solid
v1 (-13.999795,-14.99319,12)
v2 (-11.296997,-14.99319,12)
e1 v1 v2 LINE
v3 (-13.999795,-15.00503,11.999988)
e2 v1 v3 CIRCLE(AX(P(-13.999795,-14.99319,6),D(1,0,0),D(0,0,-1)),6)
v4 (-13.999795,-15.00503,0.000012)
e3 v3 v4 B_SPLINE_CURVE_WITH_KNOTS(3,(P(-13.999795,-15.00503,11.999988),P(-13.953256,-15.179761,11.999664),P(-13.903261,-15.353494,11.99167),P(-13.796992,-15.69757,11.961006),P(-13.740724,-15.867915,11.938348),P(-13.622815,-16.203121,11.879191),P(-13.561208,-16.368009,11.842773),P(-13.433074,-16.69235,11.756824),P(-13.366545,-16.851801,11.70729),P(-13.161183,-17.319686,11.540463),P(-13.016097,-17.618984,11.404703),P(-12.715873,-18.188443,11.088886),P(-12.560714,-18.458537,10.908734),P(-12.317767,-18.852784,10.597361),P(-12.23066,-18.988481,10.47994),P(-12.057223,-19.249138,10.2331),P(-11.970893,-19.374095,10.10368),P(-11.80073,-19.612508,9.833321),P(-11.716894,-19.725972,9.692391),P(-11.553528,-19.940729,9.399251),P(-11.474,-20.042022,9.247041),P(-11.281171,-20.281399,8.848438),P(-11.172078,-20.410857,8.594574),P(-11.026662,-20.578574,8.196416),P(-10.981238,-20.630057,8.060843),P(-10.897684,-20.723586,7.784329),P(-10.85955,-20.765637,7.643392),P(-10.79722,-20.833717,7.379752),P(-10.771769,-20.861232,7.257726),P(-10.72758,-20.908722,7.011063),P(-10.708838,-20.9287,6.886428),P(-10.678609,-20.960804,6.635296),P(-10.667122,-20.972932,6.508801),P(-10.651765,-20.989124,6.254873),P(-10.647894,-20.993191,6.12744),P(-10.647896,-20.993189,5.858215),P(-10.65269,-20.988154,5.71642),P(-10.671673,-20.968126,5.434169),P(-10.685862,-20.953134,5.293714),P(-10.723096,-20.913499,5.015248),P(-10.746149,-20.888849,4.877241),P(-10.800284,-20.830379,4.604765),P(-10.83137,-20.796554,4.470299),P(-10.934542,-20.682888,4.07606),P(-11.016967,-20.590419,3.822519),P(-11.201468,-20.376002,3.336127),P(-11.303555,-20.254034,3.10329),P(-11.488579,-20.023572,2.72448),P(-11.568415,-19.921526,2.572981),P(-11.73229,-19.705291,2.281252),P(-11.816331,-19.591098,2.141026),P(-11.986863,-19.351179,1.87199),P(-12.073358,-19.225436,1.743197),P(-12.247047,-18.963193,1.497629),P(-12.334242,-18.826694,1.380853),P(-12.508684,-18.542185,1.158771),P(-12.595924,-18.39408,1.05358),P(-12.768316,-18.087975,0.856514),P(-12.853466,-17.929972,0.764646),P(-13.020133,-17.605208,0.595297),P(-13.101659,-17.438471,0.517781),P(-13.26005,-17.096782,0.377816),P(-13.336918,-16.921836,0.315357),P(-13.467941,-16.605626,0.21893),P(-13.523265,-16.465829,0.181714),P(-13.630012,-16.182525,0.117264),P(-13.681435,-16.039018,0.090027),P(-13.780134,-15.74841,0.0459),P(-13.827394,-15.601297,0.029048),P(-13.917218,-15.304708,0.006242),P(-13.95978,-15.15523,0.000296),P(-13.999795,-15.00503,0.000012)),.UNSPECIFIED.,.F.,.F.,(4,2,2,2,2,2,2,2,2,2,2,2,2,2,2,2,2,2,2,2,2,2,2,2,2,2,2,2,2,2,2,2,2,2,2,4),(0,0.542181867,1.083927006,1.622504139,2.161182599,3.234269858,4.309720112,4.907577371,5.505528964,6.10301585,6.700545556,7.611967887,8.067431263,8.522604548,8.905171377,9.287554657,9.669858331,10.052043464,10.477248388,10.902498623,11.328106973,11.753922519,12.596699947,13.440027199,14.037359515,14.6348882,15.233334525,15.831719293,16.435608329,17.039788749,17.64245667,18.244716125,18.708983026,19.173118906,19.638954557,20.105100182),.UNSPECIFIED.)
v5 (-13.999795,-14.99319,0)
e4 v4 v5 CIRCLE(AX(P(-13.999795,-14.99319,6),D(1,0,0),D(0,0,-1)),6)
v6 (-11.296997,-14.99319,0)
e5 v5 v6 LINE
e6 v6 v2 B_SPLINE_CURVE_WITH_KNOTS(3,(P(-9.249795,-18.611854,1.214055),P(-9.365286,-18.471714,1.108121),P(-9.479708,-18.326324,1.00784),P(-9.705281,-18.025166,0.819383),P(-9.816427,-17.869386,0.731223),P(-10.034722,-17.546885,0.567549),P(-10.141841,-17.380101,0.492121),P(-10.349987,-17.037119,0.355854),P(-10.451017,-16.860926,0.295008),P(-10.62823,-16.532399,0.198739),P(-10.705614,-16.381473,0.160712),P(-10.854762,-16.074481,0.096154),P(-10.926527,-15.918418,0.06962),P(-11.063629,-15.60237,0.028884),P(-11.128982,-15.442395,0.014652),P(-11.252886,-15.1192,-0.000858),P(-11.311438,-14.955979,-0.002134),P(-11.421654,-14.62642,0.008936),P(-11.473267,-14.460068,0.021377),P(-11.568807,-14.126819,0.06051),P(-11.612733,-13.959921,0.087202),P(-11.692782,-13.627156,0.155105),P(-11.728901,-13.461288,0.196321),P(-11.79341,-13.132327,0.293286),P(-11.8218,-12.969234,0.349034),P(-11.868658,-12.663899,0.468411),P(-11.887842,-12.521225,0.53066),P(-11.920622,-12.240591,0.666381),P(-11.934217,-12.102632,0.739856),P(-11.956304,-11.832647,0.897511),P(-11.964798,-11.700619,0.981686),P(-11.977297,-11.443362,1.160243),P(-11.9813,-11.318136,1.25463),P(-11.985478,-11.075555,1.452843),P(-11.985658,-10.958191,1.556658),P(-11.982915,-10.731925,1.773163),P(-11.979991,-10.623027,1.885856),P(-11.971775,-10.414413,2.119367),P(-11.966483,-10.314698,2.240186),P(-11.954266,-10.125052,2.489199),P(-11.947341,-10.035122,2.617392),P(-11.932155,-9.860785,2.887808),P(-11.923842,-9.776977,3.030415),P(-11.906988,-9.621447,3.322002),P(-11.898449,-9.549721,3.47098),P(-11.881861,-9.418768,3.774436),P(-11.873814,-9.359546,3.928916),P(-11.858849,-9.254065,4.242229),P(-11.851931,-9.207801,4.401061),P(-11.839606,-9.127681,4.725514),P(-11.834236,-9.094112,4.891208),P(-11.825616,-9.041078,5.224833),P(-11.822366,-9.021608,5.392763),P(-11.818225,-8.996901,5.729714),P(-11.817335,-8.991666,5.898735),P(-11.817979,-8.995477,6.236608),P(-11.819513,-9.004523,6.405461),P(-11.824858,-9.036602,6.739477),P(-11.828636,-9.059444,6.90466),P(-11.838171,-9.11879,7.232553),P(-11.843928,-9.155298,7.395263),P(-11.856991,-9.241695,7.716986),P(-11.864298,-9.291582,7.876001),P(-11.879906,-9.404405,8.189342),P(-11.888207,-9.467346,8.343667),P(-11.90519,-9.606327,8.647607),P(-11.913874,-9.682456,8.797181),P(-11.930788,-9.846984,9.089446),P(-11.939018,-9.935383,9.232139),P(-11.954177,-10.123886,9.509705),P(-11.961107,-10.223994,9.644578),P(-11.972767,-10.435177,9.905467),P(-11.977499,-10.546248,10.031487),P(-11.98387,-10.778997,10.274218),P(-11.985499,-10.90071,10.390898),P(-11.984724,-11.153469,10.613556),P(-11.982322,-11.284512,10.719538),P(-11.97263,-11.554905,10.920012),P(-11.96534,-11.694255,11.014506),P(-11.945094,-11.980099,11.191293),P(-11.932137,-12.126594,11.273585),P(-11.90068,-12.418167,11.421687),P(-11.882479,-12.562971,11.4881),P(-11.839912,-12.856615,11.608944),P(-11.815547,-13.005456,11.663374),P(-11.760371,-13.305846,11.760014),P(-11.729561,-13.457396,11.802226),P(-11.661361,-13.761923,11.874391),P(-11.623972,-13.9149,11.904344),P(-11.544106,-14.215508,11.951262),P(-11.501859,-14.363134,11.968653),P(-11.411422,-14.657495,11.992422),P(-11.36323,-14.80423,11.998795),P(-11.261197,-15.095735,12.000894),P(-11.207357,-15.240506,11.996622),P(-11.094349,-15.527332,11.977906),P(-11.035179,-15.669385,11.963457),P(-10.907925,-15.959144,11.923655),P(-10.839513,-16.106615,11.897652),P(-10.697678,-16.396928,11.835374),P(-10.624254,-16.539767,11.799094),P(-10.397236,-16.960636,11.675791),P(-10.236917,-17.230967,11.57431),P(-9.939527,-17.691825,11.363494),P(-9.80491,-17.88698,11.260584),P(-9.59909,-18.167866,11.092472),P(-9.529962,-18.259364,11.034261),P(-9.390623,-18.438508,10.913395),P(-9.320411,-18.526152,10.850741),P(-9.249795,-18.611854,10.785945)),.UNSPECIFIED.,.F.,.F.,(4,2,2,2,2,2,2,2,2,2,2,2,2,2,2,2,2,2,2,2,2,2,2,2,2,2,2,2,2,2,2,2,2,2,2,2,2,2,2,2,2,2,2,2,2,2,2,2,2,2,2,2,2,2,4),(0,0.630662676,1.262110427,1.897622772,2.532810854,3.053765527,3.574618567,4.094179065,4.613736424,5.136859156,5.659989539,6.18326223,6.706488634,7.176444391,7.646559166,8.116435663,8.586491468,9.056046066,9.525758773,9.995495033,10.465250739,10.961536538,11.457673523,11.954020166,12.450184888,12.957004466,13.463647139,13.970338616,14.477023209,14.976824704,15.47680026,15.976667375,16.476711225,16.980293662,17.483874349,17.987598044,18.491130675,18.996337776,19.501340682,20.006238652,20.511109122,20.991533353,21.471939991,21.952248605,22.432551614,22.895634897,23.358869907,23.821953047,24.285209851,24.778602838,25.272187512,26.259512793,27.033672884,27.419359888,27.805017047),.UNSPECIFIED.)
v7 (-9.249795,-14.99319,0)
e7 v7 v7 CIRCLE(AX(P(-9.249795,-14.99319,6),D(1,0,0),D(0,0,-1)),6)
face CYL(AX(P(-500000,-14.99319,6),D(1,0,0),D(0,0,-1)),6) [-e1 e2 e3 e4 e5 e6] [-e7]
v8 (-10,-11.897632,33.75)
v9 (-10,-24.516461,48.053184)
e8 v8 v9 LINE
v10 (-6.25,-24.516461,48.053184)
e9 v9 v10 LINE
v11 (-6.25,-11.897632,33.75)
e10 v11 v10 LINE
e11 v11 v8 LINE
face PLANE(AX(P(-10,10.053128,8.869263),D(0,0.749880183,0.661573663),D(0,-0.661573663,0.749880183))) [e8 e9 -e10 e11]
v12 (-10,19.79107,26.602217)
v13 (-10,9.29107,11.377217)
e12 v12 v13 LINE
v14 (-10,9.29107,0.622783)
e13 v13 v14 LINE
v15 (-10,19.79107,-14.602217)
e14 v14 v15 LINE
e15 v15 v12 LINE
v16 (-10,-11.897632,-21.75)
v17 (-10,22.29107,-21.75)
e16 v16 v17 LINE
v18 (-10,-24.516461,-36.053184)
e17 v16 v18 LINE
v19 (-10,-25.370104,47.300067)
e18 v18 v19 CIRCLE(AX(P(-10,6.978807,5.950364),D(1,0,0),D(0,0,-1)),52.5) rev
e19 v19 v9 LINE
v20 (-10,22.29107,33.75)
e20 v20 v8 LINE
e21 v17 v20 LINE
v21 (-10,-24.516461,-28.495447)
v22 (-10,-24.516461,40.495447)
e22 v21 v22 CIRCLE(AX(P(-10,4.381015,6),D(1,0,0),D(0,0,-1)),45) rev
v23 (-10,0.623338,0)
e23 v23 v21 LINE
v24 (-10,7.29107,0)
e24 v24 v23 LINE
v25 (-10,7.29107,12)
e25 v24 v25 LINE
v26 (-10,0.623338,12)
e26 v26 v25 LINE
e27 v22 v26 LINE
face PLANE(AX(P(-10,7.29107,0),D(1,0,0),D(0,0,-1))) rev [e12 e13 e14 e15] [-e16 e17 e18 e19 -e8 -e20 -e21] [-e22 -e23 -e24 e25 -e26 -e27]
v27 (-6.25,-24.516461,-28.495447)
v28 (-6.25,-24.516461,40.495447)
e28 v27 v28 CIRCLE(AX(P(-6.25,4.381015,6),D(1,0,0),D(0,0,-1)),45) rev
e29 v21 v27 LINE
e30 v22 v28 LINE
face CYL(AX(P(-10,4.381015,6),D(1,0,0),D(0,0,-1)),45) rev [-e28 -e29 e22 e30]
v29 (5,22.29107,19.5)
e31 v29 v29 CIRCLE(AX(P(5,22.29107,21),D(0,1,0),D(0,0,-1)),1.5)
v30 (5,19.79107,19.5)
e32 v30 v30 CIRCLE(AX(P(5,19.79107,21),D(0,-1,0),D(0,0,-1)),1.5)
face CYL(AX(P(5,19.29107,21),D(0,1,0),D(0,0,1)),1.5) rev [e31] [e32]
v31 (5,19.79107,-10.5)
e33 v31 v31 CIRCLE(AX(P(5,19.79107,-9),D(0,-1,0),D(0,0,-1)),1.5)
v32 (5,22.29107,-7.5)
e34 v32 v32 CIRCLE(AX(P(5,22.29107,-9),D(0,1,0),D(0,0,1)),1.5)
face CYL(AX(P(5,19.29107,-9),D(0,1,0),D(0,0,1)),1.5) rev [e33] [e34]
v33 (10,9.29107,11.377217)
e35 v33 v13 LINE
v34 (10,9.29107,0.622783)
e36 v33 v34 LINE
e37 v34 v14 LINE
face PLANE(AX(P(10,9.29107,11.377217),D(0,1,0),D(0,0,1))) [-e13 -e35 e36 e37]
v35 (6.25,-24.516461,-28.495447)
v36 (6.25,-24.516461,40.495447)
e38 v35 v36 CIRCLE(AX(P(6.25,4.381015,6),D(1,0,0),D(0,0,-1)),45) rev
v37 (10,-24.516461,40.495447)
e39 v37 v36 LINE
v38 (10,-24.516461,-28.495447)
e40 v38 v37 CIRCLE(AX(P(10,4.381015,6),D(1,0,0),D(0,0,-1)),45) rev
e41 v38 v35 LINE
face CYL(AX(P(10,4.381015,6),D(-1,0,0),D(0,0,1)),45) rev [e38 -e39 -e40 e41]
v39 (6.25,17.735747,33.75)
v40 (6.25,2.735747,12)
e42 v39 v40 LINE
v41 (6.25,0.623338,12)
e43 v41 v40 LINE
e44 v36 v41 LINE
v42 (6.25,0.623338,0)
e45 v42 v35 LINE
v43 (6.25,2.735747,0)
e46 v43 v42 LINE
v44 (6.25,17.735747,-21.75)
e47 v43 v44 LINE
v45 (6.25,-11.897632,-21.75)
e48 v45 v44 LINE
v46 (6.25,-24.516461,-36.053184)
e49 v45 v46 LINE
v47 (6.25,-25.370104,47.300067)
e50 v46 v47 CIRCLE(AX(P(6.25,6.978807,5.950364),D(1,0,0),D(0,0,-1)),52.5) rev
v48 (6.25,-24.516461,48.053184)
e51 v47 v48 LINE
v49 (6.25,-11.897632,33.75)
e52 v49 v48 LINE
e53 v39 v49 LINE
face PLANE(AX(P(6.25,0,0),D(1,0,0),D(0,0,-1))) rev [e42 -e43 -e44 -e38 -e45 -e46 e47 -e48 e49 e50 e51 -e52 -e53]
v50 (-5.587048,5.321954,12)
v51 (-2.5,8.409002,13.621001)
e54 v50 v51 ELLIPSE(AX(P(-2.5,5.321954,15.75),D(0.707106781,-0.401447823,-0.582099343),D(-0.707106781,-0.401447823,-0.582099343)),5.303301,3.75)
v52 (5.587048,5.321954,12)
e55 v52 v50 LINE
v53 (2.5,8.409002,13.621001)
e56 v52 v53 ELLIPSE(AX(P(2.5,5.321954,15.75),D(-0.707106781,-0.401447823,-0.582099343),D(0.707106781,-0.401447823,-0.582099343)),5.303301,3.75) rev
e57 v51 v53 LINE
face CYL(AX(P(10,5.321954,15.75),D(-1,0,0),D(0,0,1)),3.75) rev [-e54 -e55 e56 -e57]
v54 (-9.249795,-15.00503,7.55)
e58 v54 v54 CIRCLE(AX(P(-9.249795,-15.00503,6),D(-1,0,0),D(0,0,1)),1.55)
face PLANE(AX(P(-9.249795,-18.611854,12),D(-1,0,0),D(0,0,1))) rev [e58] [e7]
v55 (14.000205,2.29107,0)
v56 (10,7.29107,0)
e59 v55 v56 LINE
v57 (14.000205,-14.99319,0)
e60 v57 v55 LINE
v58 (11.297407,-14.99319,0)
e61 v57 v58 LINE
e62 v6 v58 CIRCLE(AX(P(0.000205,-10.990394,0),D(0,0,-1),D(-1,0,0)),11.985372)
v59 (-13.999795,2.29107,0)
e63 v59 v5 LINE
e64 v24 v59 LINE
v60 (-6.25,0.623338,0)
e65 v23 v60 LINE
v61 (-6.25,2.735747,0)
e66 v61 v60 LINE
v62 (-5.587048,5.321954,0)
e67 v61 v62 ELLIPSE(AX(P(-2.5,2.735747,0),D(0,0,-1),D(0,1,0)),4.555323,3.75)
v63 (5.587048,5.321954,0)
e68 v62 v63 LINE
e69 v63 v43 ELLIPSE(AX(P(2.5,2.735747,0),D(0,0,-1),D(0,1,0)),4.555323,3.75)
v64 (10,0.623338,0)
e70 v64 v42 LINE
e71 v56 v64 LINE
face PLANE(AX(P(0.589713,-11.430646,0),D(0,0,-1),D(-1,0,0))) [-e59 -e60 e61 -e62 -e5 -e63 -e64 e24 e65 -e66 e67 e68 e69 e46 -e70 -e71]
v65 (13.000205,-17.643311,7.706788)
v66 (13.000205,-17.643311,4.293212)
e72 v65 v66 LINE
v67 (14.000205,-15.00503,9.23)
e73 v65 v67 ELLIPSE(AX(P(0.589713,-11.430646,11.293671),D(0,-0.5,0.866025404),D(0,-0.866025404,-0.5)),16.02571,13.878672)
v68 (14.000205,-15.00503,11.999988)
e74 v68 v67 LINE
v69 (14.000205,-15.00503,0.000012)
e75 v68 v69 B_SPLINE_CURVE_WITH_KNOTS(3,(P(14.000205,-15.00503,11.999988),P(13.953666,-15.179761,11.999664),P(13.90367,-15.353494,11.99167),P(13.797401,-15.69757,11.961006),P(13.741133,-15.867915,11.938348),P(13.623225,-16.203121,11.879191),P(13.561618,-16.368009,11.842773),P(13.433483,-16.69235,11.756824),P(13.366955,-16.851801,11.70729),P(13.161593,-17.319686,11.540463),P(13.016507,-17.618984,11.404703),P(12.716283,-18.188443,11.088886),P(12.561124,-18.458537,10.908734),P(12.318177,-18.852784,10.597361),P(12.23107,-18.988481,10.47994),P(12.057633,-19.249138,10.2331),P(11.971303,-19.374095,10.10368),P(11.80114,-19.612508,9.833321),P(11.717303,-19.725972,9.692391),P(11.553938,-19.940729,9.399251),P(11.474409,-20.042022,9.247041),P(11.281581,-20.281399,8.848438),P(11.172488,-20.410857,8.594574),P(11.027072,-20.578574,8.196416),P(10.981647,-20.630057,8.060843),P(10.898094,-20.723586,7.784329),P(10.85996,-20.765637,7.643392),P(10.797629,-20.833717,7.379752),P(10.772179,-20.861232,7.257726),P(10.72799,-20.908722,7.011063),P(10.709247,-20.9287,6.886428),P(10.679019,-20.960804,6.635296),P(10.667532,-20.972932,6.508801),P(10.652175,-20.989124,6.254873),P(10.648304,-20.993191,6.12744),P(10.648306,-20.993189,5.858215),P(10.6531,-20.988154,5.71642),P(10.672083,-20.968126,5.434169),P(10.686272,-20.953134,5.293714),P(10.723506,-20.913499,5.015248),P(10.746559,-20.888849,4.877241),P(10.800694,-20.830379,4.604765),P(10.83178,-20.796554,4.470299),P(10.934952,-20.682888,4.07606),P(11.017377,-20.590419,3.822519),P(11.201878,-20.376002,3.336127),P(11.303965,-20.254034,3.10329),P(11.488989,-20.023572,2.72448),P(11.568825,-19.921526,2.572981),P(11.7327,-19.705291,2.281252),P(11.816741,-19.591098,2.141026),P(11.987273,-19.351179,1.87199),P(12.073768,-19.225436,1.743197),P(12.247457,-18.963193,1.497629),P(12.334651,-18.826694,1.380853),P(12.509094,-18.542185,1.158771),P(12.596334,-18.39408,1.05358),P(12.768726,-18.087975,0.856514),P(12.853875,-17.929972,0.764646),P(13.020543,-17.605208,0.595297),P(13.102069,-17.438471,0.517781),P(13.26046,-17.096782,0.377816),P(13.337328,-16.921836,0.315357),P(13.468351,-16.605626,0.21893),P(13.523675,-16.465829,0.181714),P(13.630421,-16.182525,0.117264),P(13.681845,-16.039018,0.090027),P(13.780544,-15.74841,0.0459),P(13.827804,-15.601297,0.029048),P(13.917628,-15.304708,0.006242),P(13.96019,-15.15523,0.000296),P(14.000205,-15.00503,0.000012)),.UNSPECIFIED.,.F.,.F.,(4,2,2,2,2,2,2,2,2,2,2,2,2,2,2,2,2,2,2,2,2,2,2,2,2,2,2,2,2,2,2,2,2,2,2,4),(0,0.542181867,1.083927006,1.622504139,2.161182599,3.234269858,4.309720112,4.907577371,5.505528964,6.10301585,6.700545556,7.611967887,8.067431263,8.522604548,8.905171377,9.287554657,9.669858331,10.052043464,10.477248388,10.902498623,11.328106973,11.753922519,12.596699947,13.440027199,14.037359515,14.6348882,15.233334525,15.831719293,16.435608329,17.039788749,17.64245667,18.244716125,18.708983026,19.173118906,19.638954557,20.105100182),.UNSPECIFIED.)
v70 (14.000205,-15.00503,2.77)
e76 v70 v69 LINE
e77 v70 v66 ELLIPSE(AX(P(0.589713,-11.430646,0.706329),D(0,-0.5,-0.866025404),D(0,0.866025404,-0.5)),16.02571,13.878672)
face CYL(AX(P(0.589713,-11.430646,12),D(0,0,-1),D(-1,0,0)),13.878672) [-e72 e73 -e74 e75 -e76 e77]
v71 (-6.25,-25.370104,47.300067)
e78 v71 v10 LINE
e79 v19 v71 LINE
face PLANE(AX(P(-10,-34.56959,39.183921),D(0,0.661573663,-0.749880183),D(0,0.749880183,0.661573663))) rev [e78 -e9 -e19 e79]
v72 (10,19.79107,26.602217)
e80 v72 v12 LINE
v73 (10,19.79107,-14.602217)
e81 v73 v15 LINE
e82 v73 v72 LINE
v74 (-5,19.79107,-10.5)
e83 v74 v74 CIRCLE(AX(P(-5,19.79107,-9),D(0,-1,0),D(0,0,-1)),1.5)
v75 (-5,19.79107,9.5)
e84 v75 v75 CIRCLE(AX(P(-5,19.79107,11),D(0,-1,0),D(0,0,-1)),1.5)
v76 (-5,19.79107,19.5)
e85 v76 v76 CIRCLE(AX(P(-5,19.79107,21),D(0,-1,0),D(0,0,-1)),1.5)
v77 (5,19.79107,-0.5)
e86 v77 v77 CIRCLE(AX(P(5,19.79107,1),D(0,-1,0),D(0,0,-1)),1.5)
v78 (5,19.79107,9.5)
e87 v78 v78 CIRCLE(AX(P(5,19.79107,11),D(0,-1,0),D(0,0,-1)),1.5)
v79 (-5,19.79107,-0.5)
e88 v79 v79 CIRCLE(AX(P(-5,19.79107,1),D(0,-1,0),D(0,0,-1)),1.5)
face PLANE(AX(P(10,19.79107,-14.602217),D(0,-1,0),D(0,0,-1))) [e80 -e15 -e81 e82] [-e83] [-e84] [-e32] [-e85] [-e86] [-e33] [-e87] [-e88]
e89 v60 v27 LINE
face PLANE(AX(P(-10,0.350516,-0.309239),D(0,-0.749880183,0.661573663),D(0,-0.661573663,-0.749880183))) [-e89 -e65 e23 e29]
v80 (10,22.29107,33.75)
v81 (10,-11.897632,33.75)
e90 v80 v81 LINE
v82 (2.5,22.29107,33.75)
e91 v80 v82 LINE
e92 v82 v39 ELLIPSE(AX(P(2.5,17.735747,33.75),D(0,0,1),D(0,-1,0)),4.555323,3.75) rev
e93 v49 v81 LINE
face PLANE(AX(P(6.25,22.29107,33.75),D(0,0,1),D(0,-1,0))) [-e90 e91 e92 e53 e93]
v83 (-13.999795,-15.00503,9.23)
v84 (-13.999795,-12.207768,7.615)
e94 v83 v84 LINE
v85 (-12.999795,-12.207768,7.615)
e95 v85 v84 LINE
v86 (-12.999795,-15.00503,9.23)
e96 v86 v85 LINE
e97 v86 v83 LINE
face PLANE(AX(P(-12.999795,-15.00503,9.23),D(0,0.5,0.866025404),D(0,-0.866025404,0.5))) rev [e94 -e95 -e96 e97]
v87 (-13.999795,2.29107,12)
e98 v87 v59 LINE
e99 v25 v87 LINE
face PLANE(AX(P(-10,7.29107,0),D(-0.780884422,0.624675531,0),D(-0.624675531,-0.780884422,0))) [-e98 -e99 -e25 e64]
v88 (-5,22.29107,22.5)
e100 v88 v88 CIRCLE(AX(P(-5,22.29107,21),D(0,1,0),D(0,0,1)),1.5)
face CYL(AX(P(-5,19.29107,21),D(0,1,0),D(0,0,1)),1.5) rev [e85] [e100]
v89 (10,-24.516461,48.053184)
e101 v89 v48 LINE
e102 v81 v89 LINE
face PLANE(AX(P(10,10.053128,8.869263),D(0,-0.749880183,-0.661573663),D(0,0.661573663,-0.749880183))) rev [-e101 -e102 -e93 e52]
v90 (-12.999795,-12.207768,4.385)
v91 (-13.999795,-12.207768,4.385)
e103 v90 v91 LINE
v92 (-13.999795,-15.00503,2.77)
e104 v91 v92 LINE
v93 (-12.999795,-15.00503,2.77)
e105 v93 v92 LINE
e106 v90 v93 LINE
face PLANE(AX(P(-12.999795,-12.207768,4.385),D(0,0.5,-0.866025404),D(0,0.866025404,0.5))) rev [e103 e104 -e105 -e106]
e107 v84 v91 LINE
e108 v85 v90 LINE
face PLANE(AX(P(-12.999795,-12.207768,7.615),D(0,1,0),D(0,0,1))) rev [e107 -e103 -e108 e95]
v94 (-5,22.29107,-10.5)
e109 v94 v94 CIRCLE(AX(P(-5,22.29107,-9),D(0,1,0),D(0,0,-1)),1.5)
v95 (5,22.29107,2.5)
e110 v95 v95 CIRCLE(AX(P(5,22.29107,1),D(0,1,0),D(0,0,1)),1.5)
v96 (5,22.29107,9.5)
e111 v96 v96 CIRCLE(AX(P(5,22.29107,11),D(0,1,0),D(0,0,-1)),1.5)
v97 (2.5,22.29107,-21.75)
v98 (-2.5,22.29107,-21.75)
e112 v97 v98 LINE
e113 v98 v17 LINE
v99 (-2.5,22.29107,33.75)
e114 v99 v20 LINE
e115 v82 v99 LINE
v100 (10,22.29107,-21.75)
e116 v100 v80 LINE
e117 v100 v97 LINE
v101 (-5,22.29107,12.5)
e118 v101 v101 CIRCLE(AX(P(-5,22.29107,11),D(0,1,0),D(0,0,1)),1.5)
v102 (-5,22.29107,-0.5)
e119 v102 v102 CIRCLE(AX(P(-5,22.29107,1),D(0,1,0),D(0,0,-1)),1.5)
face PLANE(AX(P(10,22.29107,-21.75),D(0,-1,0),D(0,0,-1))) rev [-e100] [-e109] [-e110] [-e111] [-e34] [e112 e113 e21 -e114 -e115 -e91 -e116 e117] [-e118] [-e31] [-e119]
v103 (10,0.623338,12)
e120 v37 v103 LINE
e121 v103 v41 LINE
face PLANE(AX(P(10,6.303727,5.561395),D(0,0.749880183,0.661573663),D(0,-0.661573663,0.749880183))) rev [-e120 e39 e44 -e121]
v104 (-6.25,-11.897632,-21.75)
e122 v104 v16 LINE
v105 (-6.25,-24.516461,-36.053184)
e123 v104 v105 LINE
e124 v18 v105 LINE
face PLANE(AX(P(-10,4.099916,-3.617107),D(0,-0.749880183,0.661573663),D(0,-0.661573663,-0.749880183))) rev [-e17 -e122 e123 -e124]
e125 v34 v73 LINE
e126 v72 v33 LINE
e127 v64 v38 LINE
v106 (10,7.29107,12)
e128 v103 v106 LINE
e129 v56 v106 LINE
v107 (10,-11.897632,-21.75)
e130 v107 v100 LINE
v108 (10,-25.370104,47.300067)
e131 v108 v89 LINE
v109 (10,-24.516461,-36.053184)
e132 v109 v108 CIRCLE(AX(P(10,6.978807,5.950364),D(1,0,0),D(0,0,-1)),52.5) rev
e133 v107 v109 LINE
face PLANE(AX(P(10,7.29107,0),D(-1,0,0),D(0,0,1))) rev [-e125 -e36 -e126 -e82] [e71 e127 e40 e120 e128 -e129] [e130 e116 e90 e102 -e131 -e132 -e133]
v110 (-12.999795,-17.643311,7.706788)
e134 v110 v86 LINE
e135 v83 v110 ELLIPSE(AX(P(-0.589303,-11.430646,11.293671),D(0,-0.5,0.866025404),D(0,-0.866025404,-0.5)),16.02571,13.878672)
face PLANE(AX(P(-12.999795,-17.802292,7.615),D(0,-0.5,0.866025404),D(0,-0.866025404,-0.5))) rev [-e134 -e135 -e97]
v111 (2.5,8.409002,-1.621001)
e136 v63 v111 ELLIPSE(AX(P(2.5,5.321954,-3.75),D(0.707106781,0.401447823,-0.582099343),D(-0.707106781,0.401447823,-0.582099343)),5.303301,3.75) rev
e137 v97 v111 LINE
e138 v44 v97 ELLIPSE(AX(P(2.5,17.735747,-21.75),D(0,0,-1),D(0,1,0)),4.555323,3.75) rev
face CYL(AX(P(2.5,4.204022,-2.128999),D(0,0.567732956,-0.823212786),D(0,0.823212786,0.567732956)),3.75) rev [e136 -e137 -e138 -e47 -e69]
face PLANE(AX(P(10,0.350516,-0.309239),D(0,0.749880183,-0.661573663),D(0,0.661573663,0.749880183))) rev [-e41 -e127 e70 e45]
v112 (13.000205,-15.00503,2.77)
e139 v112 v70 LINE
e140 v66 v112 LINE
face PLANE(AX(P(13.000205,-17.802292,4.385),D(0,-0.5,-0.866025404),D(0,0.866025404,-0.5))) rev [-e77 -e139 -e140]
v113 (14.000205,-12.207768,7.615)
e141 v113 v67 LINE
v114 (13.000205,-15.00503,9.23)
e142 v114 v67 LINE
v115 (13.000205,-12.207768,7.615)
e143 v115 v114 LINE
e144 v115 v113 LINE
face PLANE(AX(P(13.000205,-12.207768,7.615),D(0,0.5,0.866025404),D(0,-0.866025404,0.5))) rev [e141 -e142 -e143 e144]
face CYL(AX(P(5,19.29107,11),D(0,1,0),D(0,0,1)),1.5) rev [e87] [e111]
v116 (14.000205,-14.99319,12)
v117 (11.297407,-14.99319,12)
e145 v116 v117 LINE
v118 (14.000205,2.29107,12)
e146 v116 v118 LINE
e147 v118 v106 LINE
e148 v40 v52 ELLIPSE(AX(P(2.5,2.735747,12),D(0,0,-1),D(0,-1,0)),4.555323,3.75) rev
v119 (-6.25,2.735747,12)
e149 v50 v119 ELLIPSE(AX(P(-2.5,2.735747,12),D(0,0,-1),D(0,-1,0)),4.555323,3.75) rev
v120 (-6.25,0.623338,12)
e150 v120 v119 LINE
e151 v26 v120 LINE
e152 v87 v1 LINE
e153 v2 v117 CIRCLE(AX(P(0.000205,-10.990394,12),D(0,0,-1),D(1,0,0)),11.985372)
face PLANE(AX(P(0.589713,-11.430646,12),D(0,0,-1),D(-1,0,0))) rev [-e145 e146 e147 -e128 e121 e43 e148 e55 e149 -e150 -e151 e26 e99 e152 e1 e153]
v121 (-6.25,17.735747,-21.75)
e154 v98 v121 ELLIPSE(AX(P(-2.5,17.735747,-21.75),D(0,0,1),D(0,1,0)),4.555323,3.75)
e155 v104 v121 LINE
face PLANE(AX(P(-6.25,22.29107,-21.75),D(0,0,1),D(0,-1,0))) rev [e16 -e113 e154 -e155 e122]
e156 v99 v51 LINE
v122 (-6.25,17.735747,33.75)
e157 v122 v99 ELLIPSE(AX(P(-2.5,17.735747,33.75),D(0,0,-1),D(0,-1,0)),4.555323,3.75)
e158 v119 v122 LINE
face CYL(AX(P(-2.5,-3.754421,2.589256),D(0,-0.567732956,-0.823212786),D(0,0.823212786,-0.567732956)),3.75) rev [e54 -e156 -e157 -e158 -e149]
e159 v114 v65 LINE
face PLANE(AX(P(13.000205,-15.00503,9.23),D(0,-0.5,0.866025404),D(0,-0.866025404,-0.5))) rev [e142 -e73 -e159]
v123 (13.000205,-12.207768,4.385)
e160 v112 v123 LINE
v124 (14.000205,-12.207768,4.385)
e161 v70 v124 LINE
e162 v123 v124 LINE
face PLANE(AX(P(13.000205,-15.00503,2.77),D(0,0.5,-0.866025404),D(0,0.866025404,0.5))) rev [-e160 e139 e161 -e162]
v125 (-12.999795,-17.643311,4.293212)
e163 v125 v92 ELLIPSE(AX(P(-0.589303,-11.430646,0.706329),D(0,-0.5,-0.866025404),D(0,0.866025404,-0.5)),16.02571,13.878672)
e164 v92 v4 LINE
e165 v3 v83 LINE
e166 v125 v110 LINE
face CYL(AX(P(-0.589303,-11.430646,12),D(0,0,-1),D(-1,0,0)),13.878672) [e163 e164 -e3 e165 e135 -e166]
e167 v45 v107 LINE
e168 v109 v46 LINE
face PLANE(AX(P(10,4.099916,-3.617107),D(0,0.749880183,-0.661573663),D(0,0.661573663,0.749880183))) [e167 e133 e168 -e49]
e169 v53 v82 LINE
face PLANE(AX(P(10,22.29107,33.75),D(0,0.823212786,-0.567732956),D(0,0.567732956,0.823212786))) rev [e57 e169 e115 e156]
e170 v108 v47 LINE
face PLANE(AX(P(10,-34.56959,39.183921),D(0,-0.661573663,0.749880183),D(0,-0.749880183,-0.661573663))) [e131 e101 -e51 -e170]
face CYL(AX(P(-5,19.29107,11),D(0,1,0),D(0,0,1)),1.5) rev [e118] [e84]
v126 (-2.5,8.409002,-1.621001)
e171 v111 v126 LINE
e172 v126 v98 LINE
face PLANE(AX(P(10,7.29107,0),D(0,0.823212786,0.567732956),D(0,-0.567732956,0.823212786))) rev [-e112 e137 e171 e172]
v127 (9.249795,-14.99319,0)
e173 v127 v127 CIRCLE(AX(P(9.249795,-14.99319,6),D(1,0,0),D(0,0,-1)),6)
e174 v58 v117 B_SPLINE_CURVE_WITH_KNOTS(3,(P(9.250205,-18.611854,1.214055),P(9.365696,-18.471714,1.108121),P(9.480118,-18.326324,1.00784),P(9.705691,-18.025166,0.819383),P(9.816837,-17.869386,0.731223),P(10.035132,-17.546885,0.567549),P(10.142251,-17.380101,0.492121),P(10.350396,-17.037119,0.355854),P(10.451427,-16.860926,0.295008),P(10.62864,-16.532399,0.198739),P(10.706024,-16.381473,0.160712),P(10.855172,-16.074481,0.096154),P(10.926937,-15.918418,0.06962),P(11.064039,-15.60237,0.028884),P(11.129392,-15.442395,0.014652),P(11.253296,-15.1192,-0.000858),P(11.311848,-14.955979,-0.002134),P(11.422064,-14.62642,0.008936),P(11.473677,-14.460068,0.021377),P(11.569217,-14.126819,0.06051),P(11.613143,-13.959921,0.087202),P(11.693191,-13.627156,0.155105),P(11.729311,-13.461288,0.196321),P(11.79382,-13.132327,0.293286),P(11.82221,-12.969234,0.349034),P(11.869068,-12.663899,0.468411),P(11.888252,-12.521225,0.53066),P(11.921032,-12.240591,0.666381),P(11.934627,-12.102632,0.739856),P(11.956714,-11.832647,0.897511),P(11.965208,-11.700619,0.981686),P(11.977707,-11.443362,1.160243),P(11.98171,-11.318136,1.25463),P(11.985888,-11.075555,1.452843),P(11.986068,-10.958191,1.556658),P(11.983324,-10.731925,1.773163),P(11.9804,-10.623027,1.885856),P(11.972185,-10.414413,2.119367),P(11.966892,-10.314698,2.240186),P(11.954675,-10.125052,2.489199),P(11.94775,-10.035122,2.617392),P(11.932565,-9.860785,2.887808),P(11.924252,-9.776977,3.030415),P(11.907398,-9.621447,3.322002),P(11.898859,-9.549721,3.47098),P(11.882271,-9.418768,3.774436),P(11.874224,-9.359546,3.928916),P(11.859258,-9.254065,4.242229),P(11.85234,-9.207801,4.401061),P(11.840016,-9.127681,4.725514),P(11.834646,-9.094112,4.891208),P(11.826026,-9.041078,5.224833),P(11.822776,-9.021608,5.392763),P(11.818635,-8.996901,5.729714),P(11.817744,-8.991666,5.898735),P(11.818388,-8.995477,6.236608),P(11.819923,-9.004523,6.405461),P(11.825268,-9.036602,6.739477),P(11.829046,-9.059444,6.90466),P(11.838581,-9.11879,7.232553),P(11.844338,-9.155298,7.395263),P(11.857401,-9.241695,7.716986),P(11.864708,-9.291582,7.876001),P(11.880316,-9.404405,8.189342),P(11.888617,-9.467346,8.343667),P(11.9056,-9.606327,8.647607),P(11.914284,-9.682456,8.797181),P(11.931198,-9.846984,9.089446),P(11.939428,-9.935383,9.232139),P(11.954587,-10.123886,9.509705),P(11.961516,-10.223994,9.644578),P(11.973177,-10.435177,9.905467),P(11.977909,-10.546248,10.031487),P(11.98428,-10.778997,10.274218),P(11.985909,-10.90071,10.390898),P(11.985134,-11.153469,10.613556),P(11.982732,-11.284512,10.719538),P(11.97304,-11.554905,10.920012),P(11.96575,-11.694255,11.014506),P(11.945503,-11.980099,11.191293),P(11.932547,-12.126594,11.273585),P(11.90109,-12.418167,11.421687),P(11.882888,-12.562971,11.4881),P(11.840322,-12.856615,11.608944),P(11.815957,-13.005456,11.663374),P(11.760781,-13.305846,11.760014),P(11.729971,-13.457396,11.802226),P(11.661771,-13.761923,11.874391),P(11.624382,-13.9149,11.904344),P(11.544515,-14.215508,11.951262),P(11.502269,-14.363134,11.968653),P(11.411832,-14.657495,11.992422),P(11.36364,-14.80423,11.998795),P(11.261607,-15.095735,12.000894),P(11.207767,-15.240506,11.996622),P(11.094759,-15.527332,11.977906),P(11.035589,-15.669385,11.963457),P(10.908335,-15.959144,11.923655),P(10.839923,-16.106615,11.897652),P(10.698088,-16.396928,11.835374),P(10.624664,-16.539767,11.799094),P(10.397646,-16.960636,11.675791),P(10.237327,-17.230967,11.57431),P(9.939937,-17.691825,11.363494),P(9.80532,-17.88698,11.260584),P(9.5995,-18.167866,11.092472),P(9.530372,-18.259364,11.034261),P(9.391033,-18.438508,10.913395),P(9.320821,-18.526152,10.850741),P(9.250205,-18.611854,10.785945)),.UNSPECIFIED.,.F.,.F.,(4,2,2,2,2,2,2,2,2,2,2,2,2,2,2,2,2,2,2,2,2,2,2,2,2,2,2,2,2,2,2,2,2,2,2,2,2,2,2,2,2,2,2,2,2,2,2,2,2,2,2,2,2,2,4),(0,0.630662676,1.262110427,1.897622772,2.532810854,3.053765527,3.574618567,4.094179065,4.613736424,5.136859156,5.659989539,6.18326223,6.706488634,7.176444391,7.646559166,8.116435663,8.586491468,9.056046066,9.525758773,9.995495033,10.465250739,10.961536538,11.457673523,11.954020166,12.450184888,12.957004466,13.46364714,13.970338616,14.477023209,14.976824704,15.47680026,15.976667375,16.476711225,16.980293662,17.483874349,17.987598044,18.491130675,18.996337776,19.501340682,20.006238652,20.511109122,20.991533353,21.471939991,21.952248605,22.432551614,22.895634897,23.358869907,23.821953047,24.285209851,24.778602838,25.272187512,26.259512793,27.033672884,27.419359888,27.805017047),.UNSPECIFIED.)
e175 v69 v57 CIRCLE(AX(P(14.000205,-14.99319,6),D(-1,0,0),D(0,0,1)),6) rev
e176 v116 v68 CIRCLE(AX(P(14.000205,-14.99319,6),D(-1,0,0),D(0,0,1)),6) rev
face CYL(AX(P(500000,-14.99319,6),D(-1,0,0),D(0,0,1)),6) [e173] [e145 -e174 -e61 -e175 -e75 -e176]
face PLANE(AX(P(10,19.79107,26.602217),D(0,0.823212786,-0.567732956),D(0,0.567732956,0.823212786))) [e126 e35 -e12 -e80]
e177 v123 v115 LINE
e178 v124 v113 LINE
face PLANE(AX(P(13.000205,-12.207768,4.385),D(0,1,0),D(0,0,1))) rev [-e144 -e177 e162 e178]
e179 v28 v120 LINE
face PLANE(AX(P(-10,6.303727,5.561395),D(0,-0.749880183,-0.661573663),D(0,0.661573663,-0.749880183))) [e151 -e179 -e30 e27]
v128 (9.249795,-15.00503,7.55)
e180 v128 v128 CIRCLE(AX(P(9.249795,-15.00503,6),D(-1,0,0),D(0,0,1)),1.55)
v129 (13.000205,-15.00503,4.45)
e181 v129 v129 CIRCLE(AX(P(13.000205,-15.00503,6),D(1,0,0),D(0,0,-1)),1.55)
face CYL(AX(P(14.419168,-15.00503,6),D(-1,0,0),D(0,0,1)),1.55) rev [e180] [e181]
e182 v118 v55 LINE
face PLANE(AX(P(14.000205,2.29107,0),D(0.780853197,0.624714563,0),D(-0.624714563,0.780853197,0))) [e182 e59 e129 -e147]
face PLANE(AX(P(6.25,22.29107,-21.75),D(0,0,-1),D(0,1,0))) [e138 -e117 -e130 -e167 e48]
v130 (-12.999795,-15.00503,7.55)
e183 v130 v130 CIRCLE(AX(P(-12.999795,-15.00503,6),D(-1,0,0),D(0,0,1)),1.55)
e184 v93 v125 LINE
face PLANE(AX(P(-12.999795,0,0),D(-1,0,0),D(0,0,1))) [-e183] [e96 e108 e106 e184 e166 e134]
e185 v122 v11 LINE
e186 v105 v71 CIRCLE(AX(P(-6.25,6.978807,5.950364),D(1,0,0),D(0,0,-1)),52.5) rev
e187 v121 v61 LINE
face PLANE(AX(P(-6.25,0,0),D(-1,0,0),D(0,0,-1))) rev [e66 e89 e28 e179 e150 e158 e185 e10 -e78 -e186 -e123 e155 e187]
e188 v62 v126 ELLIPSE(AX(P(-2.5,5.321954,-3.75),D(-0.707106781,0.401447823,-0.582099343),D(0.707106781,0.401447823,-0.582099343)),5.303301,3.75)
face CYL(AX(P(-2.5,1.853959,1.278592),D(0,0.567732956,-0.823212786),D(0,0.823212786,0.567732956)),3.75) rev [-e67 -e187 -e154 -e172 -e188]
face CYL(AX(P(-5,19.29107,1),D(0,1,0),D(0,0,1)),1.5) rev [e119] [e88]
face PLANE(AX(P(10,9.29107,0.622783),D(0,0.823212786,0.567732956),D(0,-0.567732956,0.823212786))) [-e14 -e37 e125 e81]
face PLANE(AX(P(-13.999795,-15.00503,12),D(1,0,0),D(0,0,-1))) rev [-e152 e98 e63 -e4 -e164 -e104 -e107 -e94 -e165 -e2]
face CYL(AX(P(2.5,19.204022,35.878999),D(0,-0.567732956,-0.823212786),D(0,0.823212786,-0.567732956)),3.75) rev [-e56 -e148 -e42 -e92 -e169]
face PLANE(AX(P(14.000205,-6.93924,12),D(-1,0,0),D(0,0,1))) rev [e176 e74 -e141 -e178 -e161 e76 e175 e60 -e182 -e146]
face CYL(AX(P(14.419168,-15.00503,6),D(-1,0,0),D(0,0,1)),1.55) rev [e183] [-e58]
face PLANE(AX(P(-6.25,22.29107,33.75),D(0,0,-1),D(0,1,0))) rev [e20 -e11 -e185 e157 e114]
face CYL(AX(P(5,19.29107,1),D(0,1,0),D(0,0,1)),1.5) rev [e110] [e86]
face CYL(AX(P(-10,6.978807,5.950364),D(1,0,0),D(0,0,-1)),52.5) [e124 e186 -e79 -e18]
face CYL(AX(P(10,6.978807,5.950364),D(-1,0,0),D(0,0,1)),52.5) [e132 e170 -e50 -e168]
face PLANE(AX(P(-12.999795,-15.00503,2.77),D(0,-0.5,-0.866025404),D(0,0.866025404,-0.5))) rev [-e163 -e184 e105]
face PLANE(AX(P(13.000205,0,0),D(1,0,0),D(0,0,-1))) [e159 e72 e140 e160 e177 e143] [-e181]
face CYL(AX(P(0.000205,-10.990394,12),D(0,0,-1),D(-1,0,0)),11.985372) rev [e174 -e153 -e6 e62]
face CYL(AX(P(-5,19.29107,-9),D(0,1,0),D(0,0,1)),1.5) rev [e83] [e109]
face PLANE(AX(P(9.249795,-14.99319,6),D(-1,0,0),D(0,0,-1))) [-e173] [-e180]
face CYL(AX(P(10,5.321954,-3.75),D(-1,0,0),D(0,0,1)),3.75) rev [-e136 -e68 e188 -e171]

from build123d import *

# Parameters (mm, degrees)
EXTRUDE_1_DEPTH      = 12
EXTRUDE_2_REACH      = 35.545
EXTRUDE_2_END_RADIUS = 11.985372339
SKETCH_2_R           = 6
MIRROR_START         = 9.249795062
MIRROR_1_DEPTH       = 2.735782315
MIRROR_1_2_DEPTH     = 0.000409876
CUT_EXTRUDE_1_DEPTH  = 34.545141776
CUT_EXTRUDE_2_DEPTH  = 1
CUT_EXTRUDE_3_DEPTH  = 1
MIRROR_START_2       = 9.250204938
MIRROR_3_DEPTH       = 5.749795062
SKETCH_6_R           = 1.55
CUT_EXTRUDE_4_DEPTH  = 37.245193425
SKETCH_12_W          = 20
SKETCH_12_H          = 12
EXTRUDE_4_DEPTH      = 5
EXTRUDE_5_DEPTH      = 10
EXTRUDE_6_DEPTH      = 12
EXTRUDE_7_DEPTH      = 3.75
EXTRUDE_8_DEPTH      = 3.75
FILLET_1_R           = 3.75
SKETCH_21_R          = 1.5
CUT_EXTRUDE_5_DEPTH  = 3


with BuildPart() as part:
    # 스케치1 → 보스-돌출1 (new body)
    with BuildSketch(Plane.XY):
        with BuildLine():
            Line((14.000204938, 2.291069809), (-13.999795062, 2.291069809))
            Line((-13.999795062, 2.291069809), (-13.999795062, -6.939240191))
            Line((-13.999795062, -6.939240191), (-13.999795062, -15.005030191))
            ThreePointArc((-13.999795062, -15.005030191), (-12.699794, -18.209549332), (-10.647895062, -20.993190191))
            Line((-10.647895062, -20.993190191), (-9.249795062, -20.993190191))
            Line((-9.249795062, -20.993190191), (-9.249795062, -18.61185417))
            ThreePointArc((-9.249795062, -18.61185417), (-10.428409882, -16.897436148), (-11.292795062, -15.005030191))
            ThreePointArc((-11.292795062, -15.005030191), (0.000204938, 0.99497801), (11.293204938, -15.005030191))
            ThreePointArc((11.293204938, -15.005030191), (10.428819757, -16.897436148), (9.250204938, -18.61185417))
            Line((9.250204938, -18.61185417), (9.250204938, -20.993190191))
            Line((9.250204938, -20.993190191), (10.648304938, -20.993190191))
            ThreePointArc((10.648304938, -20.993190191), (12.700203875, -18.209549332), (14.000204938, -15.005030191))
            Line((14.000204938, -15.005030191), (14.000204938, -6.939240191))
            Line((14.000204938, -6.939240191), (14.000204938, 2.291069809))
        make_face()
    extrude(amount=EXTRUDE_1_DEPTH)

    # 보스-돌출2: up to this cylinder (the profile starts inside it)
    extrude_2_end = Plane(origin=(0.000204938, -10.990394329, 6), z_dir=(0, 0, -1)) * Cylinder(EXTRUDE_2_END_RADIUS, 96.060744678, mode=Mode.PRIVATE)
    # 스케치2 → 보스-돌출2 (add, up to the surface)
    with BuildSketch(Plane(origin=(-9.249795062, 0, 0), x_dir=(0, 0, -1), z_dir=(1, 0, 0)), mode=Mode.PRIVATE) as extrude_2_sk1:
        with Locations((-6, -14.993190191)):
            Circle(SKETCH_2_R)
    extrude_2_tool1 = extrude(extrude_2_sk1.sketch, amount=-EXTRUDE_2_REACH, mode=Mode.PRIVATE) & extrude_2_end
    add(extrude_2_tool1.solids().sort_by_distance((-9.249795, -14.99319, 6))[0])

    # 대칭 복사1: read off the stored shape, not the designer's step
    # 대칭 복사1 outline → 대칭 복사1 (add)
    with BuildSketch(Plane.YZ.offset(MIRROR_START)):
        with BuildLine():
            ThreePointArc((-18.61185417, 1.214054847), (-8.993190191, 6), (-18.61185417, 10.785945153))
            Line((-18.61185417, 10.785945153), (-18.61185417, 1.214054847))
        make_face()
    extrude(amount=MIRROR_1_DEPTH)

    # Mirror 1 2 outline → Mirror 1 2 (add)
    with BuildSketch(Plane.YZ.offset(MIRROR_START)):
        with BuildLine():
            Line((-18.61185417, 1.214054847), (-18.61185417, 10.785945153))
            ThreePointArc((-18.61185417, 10.785945153), (-20.993190191, 6), (-18.61185417, 1.214054847))
        make_face()
    extrude(amount=MIRROR_1_2_DEPTH)

    # 스케치3 → 컷-돌출1 (cut, through all)
    with BuildSketch(Plane(origin=(-9.249795062, 0, 0), x_dir=(0, 0, -1), z_dir=(1, 0, 0))):
        with BuildLine():
            Line((-6, -20.993190191), (0, -20.993190191))
            Line((0, -20.993190191), (0, -18.61185417))
            Line((0, -18.61185417), (-1.214054847, -18.61185417))
            ThreePointArc((-1.214054847, -18.61185417), (-3.327172272, -20.364967545), (-6, -20.993190191))
        make_face()
        with BuildLine():
            Line((-12, -20.993190191), (-6, -20.993190191))
            ThreePointArc((-6, -20.993190191), (-8.672827728, -20.364967545), (-10.785945153, -18.61185417))
            Line((-10.785945153, -18.61185417), (-12, -18.61185417))
            Line((-12, -18.61185417), (-12, -20.993190191))
        make_face()
        with BuildLine():
            Line((-12, -18.61185417), (-10.785945153, -18.61185417))
            ThreePointArc((-10.785945153, -18.61185417), (-11.688394805, -16.901635773), (-12, -14.993190191))
            Line((-12, -14.993190191), (-12, -18.61185417))
        make_face()
        with BuildLine():
            Line((-1.214054847, -18.61185417), (0, -18.61185417))
            Line((0, -18.61185417), (0, -14.993190191))
            ThreePointArc((0, -14.993190191), (-0.311605195, -16.901635773), (-1.214054847, -18.61185417))
        make_face()
    extrude(amount=-CUT_EXTRUDE_1_DEPTH, mode=Mode.SUBTRACT)

    # 스케치4 → 컷-돌출2 (cut)
    with BuildSketch(Plane.ZY.offset(13.999795062)):
        Polygon((9.23, -15.005030191), (7.615, -12.207768137), (4.385, -12.207768137), (2.77, -15.005030191), (4.385, -17.802292245), (7.615, -17.802292245), align=None)
    extrude(amount=-CUT_EXTRUDE_2_DEPTH, mode=Mode.SUBTRACT)

    # 스케치5 → 컷-돌출3 (cut)
    with BuildSketch(Plane(origin=(14.000204938, 0, 0), x_dir=(0, 0, -1), z_dir=(1, 0, 0))):
        Polygon((-2.77, -15.005030191), (-4.385, -12.207768137), (-7.615, -12.207768137), (-9.23, -15.005030191), (-7.615, -17.802292245), (-4.385, -17.802292245), align=None)
    extrude(amount=-CUT_EXTRUDE_3_DEPTH, mode=Mode.SUBTRACT)

    # 대칭 복사3: read off the stored shape, not the designer's step
    # 대칭 복사3 outline → 대칭 복사3 (cut)
    with BuildSketch(Plane.YZ.offset(MIRROR_START_2)):
        with BuildLine():
            ThreePointArc((-20.993190191, 6), (-19.235830878, 10.242640687), (-14.993190191, 12))
            Line((-14.993190191, 12), (-20.993190191, 12))
            Line((-20.993190191, 12), (-20.993190191, 6))
        make_face()
        with BuildLine():
            Line((-20.993190191, 0), (-14.993190191, 0))
            ThreePointArc((-14.993190191, 0), (-19.235830878, 1.757359313), (-20.993190191, 6))
            Line((-20.993190191, 6), (-20.993190191, 0))
        make_face()
    extrude(amount=MIRROR_3_DEPTH, mode=Mode.SUBTRACT)

    # 스케치6 → 컷-돌출4 (cut, through all)
    with BuildSketch(Plane.ZY.offset(12.999795062)):
        with Locations((6, -15.005030191)):
            Circle(SKETCH_6_R)
    extrude(amount=-CUT_EXTRUDE_4_DEPTH, mode=Mode.SUBTRACT)

    # 스케치12 → 보스-돌출4 (add)
    with BuildSketch(Plane(origin=(0, 2.291069809, 0), x_dir=(1, 0, 0), z_dir=(0, 1, 0))):
        with Locations((0, -6)):
            Rectangle(SKETCH_12_W, SKETCH_12_H)
    extrude(amount=EXTRUDE_4_DEPTH)

    # 스케치14 → 보스-돌출5 (add, symmetric)
    with BuildSketch(Plane(origin=(0, 0, 0), x_dir=(0, 0, -1), z_dir=(1, 0, 0))):
        Polygon((-12, 7.291069809), (0, 7.291069809), (21.75, 22.291069809), (-33.75, 22.291069809), align=None)
        Polygon((-11.377217009, 9.291069809), (-0.622782991, 9.291069809), (14.602217009, 19.791069809), (-26.602217009, 19.791069809), align=None, mode=Mode.SUBTRACT)
    extrude(amount=EXTRUDE_5_DEPTH, both=True)

    # 스케치15 → 보스-돌출6 (add)
    with BuildSketch(Plane.XY.offset(12)):
        Polygon((-10, 7.291069809), (-13.999795062, 2.291069809), (-10, 2.291069809), align=None)
        Polygon((10, 2.291069809), (14.000204938, 2.291069809), (10, 7.291069809), align=None)
    extrude(amount=-EXTRUDE_6_DEPTH)

    # 스케치19 → 보스-돌출7 (add)
    with BuildSketch(Plane(origin=(6.25, 0, 0), x_dir=(0, 0, -1), z_dir=(1, 0, 0))):
        with BuildLine():
            Line((-12, 0.623337928), (-12, 7.291069809))
            Line((-12, 7.291069809), (-48.053184311, -24.516461273))
            Line((-48.053184311, -24.516461273), (-47.300067067, -25.370104227))
            ThreePointArc((-47.300067067, -25.370104227), (-5.412725687, -45.518439989), (36.053184311, -24.516461273))
            Line((36.053184311, -24.516461273), (0, 7.291069809))
            Line((0, 7.291069809), (0, 0.623337928))
            Line((0, 0.623337928), (28.495446937, -24.516461273))
            ThreePointArc((28.495446937, -24.516461273), (-6, -40.618984902), (-40.495446937, -24.516461273))
            Line((-40.495446937, -24.516461273), (-12, 0.623337928))
        make_face()
    extrude_7 = extrude(amount=EXTRUDE_7_DEPTH)

    # 대칭 복사4: 보스-돌출7 across plane
    add(extrude_7.mirror(Plane(origin=(0, 0, 0), x_dir=(0, 0, 1), z_dir=(1, 0, 0))))

    # 스케치20 → 보스-돌출8 (add)
    with BuildSketch(Plane(origin=(10, 0, 0), x_dir=(0, 0, -1), z_dir=(1, 0, 0))):
        Polygon((-12, 7.291069809), (-33.75, 22.291069809), (-33.75, -11.897631945), align=None)
        Polygon((21.75, 22.291069809), (21.75, -11.897631945), (0, 7.291069809), align=None)
    extrude_8 = extrude(amount=-EXTRUDE_8_DEPTH)

    # 대칭 복사5: 보스-돌출8 across plane
    add(extrude_8.mirror(Plane(origin=(0, 0, 0), x_dir=(0, 0, 1), z_dir=(1, 0, 0))))

    # 필렛1
    # the kernel refuses this fillet: 3.75 mm, written as the material it adds along each edge
    with BuildSketch(Plane(origin=(-6.25, 7.291069809, 0), x_dir=(0, -1, 0), z_dir=(1, 0, 0))) as fillet_1_piece_1_section:
        with BuildLine():
            CenterArc((FILLET_1_R * 0.525097583021, FILLET_1_R), FILLET_1_R, 214.592288688, 55.407711312)
            Line((-FILLET_1_R * 0.298115202894, FILLET_1_R * 0.432267044196), (0, 0))
            Line((0, 0), (FILLET_1_R * 0.525097583021, 0))
        make_face()
    fillet_1_piece_1 = extrude(amount=17.422789841, mode=Mode.PRIVATE)
    fillet_1_piece_1 = split(fillet_1_piece_1, bisect_by=Plane(origin=(10, 7.291069809, 0), z_dir=(-1, 0, 0)), keep=Keep.TOP, mode=Mode.PRIVATE)
    add(fillet_1_piece_1)
    with BuildSketch(Plane(origin=(11.172789841, 7.291069809, 12), x_dir=(0, -1, 0), z_dir=(-1, 0, 0))) as fillet_1_piece_2_section:
        with BuildLine():
            CenterArc((FILLET_1_R * 0.525097583021, FILLET_1_R), FILLET_1_R, 214.592288688, 55.407711312)
            Line((-FILLET_1_R * 0.298115202894, FILLET_1_R * 0.432267044196), (0, 0))
            Line((0, 0), (FILLET_1_R * 0.525097583021, 0))
        make_face()
    fillet_1_piece_2 = extrude(amount=17.422789841, mode=Mode.PRIVATE)
    fillet_1_piece_2 = split(fillet_1_piece_2, bisect_by=Plane(origin=(10, 7.291069809, 12), z_dir=(-1, 0, 0)), keep=Keep.TOP, mode=Mode.PRIVATE)
    add(fillet_1_piece_2)
    with BuildSketch(Plane(origin=(6.25, 1.968573348, 4.282380132), x_dir=(-1, 0, 0), z_dir=(0, 0.5677329558036596, 0.8232127859153063))) as fillet_1_piece_3_section:
        with BuildLine():
            CenterArc((FILLET_1_R, FILLET_1_R), FILLET_1_R, 180, 90)
            Line((0, FILLET_1_R), (0, 0))
            Line((0, 0), (FILLET_1_R, 0))
        make_face()
    fillet_1_piece_3 = extrude(amount=45.170872431, mode=Mode.PRIVATE)
    fillet_1_piece_3 = split(fillet_1_piece_3, bisect_by=Plane(origin=(6.25, 1.968573348, 12), z_dir=(0, 0, 1)), keep=Keep.TOP, mode=Mode.PRIVATE)
    fillet_1_piece_3 = split(fillet_1_piece_3, bisect_by=Plane(origin=(6.25, 1.968573348, 33.75), z_dir=(0, 0, -1)), keep=Keep.TOP, mode=Mode.PRIVATE)
    add(fillet_1_piece_3)
    with BuildSketch(Plane(origin=(6.25, 1.968573348, 7.717619868), x_dir=(0, -0.8232127859153062, -0.5677329558036597), z_dir=(0, 0.5677329558036597, -0.8232127859153062))) as fillet_1_piece_4_section:
        with BuildLine():
            CenterArc((FILLET_1_R, FILLET_1_R), FILLET_1_R, 180, 90)
            Line((0, FILLET_1_R), (0, 0))
            Line((0, 0), (FILLET_1_R, 0))
        make_face()
    fillet_1_piece_4 = extrude(amount=45.170872431, mode=Mode.PRIVATE)
    fillet_1_piece_4 = split(fillet_1_piece_4, bisect_by=Plane(origin=(6.25, 1.968573348, 0), z_dir=(0, 0, -1)), keep=Keep.TOP, mode=Mode.PRIVATE)
    fillet_1_piece_4 = split(fillet_1_piece_4, bisect_by=Plane(origin=(6.25, 1.968573348, -21.75), z_dir=(0, 0, 1)), keep=Keep.TOP, mode=Mode.PRIVATE)
    add(fillet_1_piece_4)
    with BuildSketch(Plane(origin=(-6.25, 1.968573348, 4.282380132), x_dir=(0, -0.8232127859153063, 0.5677329558036595), z_dir=(0, 0.5677329558036596, 0.8232127859153063))) as fillet_1_piece_5_section:
        with BuildLine():
            CenterArc((FILLET_1_R, FILLET_1_R), FILLET_1_R, 180, 90)
            Line((0, FILLET_1_R), (0, 0))
            Line((0, 0), (FILLET_1_R, 0))
        make_face()
    fillet_1_piece_5 = extrude(amount=45.170872431, mode=Mode.PRIVATE)
    fillet_1_piece_5 = split(fillet_1_piece_5, bisect_by=Plane(origin=(-6.25, 1.968573348, 12), z_dir=(0, 0, 1)), keep=Keep.TOP, mode=Mode.PRIVATE)
    fillet_1_piece_5 = split(fillet_1_piece_5, bisect_by=Plane(origin=(-6.25, 1.968573348, 33.75), z_dir=(0, 0, -1)), keep=Keep.TOP, mode=Mode.PRIVATE)
    add(fillet_1_piece_5)
    with BuildSketch(Plane(origin=(-6.25, 1.968573348, 7.717619868), x_dir=(0, -0.8232127859153062, -0.5677329558036597), z_dir=(0, 0.5677329558036597, -0.8232127859153062))) as fillet_1_piece_6_section:
        with BuildLine():
            CenterArc((FILLET_1_R, -FILLET_1_R), FILLET_1_R, 90, 90)
            Line((0, -FILLET_1_R), (0, 0))
            Line((0, 0), (FILLET_1_R, 0))
        make_face()
    fillet_1_piece_6 = extrude(amount=45.170872431, mode=Mode.PRIVATE)
    fillet_1_piece_6 = split(fillet_1_piece_6, bisect_by=Plane(origin=(-6.25, 1.968573348, 0), z_dir=(0, 0, -1)), keep=Keep.TOP, mode=Mode.PRIVATE)
    fillet_1_piece_6 = split(fillet_1_piece_6, bisect_by=Plane(origin=(-6.25, 1.968573348, -21.75), z_dir=(0, 0, 1)), keep=Keep.TOP, mode=Mode.PRIVATE)
    add(fillet_1_piece_6)

    # 스케치21 → 컷-돌출5 (cut)
    with BuildSketch(Plane(origin=(0, 22.291069809, 0), x_dir=(1, 0, 0), z_dir=(0, 1, 0))):
        with Locations(Location((5, 9, 0), (0, 0, 270))):
            Circle(SKETCH_21_R)
        with Locations(Location((5, -1, 0), (0, 0, 270))):
            Circle(SKETCH_21_R)
        with Locations(Location((-5, 9, 0), (0, 0, 90))):
            Circle(SKETCH_21_R)
        with Locations(Location((-5, -1, 0), (0, 0, 90))):
            Circle(SKETCH_21_R)
        with Locations(Location((5, -11, 0), (0, 0, 90))):
            Circle(SKETCH_21_R)
        with Locations(Location((5, -21, 0), (0, 0, 90))):
            Circle(SKETCH_21_R)
        with Locations(Location((-5, -21, 0), (0, 0, 270))):
            Circle(SKETCH_21_R)
        with Locations(Location((-5, -11, 0), (0, 0, 270))):
            Circle(SKETCH_21_R)
    extrude(amount=-CUT_EXTRUDE_5_DEPTH, mode=Mode.SUBTRACT)


solid = part.part
